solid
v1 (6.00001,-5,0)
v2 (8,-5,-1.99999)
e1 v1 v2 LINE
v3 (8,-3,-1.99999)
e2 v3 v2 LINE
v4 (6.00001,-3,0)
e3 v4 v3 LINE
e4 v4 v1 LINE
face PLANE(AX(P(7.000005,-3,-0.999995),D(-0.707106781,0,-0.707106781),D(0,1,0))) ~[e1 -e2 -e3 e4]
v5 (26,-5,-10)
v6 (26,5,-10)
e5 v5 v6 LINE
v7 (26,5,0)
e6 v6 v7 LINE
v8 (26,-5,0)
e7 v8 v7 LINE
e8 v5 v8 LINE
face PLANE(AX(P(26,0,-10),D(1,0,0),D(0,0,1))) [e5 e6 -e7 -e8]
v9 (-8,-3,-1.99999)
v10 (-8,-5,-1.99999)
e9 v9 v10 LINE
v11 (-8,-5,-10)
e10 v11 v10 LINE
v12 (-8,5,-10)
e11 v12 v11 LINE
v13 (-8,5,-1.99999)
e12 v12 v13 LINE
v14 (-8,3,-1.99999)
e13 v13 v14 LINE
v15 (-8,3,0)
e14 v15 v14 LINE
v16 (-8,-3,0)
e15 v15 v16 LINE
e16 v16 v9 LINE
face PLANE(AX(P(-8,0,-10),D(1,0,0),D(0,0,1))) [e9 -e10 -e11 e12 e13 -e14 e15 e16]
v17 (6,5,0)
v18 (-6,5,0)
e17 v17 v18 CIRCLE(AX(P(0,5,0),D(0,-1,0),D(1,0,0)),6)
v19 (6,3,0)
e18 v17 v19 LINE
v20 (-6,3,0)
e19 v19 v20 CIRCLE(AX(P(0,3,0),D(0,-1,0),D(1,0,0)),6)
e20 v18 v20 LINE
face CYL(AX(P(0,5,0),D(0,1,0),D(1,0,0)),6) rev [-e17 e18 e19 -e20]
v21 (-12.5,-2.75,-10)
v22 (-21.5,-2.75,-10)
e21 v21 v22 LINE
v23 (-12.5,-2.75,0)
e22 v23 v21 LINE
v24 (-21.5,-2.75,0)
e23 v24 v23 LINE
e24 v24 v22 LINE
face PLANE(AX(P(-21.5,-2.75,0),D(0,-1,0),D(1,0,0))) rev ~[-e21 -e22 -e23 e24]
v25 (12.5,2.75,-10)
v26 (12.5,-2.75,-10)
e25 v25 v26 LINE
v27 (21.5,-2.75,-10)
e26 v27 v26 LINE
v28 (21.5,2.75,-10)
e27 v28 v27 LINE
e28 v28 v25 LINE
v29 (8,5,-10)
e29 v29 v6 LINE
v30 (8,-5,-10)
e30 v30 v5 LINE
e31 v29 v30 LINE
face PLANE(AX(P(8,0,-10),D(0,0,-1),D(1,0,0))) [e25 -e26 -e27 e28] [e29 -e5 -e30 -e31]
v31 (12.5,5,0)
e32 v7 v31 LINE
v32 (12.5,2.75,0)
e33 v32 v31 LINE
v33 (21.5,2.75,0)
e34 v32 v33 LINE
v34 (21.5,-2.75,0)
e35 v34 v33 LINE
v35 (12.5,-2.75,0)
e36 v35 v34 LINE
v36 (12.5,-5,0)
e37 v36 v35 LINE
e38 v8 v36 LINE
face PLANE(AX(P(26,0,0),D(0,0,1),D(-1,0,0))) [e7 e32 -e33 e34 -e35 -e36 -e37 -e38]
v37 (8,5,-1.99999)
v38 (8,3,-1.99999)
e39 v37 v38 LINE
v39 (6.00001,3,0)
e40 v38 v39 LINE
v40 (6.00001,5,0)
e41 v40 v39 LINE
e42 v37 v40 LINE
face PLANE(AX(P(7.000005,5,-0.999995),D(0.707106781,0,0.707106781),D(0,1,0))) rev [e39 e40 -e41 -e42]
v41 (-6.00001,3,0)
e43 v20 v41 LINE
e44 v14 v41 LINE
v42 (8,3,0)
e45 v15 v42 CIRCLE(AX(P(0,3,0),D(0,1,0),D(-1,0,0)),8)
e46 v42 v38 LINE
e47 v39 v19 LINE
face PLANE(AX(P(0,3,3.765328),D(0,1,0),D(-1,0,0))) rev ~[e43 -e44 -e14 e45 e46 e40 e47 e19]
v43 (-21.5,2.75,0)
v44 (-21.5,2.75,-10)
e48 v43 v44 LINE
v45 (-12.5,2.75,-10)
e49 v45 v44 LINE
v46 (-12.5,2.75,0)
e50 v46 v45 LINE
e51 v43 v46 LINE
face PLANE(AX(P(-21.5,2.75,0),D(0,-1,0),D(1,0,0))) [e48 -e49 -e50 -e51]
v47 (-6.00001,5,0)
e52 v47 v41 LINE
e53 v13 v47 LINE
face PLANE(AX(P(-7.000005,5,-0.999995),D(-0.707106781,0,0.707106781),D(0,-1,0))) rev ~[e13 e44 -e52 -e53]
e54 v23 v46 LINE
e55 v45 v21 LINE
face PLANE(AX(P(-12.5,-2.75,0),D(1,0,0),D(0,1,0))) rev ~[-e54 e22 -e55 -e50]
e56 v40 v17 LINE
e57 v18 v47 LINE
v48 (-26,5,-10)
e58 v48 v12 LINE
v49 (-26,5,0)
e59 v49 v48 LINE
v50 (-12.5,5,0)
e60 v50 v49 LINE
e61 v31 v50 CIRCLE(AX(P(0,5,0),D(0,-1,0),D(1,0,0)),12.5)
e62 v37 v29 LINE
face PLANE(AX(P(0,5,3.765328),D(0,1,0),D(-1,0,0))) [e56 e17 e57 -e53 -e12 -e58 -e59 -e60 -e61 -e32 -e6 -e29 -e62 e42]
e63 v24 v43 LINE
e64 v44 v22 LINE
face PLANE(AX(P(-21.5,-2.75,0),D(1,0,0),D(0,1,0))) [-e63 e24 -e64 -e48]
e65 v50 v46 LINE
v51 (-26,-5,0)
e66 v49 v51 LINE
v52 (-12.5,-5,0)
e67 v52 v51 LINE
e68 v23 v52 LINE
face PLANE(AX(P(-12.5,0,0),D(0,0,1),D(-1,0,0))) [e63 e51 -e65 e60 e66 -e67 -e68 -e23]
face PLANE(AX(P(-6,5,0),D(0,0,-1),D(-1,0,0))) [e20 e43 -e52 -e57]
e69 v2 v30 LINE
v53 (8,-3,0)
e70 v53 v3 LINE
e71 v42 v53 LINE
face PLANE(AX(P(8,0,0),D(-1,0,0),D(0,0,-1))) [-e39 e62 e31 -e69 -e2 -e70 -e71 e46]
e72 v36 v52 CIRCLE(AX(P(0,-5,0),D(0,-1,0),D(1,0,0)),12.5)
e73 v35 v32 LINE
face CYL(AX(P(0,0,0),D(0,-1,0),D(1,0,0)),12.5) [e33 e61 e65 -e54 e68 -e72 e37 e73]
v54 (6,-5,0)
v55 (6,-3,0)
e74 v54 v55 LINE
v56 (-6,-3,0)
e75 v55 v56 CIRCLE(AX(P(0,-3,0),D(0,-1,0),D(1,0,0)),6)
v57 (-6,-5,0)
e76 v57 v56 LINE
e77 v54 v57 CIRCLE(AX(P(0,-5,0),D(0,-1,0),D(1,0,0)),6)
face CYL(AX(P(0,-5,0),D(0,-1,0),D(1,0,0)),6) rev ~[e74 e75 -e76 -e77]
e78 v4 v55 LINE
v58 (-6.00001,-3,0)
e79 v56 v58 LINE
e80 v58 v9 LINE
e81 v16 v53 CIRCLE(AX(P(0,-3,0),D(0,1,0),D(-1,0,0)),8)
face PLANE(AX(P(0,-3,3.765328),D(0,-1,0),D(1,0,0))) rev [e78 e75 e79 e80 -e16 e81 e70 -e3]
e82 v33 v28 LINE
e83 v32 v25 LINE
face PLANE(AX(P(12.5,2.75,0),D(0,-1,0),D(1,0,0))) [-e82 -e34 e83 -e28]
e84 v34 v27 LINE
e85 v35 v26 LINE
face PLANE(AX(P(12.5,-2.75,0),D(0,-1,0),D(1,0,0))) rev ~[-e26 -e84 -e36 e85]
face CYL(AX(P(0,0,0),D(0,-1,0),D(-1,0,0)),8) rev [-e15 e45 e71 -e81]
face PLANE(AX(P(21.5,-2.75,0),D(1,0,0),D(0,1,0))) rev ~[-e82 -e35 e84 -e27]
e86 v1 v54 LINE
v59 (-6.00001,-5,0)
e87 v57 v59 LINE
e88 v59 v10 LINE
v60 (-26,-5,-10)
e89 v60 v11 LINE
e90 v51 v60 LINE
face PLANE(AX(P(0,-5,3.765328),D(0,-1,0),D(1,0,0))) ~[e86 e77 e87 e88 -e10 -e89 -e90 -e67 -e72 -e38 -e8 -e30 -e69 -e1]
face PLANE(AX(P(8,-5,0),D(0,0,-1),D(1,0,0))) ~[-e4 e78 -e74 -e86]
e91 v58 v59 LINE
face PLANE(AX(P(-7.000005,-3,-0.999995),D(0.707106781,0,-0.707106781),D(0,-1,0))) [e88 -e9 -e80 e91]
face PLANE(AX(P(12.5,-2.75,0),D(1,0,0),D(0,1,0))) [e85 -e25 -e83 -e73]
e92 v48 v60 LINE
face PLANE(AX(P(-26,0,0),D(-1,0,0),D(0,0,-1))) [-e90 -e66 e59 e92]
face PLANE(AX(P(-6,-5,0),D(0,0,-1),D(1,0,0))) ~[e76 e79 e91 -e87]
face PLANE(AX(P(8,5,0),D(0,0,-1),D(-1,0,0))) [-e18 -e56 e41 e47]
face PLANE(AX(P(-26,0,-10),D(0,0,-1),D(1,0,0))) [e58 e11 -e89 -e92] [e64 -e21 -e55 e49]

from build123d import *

# Parameters (mm, degrees)
F1_DEPTH      = 5
F1_DEPTH_BACK = 5
F3_DEPTH      = 2
F5_W          = 9
F5_H          = 5.5
F6_DEPTH      = 25
F7_SIZE       = 1.99999


# Not quite as in the source:
# - a fillet or chamfer is up to 0.001 mm smaller than in the source, because OpenCascade refuses the exact size


with BuildPart() as f1:
    # F0 (on Front) → F1 (new body, two sides)
    with BuildSketch(Plane.XZ) as f1_sk:
        with BuildLine():
            Line((8, 0), (12.5, 0))
            ThreePointArc((12.5, 0), (0, 12.5), (-12.5, 0))
            Line((-12.5, 0), (-8, 0))
            ThreePointArc((-8, 0), (0, 8), (8, 0))
        make_face()
        Polygon((26, 0), (12.5, 0), (8, 0), (8, -10), (26, -10), align=None)
        Polygon((-8, 0), (-12.5, 0), (-26, 0), (-26, -10), (-8, -10), align=None)
    extrude(amount=F1_DEPTH)
    extrude(f1_sk.sketch, amount=-F1_DEPTH_BACK)

    # F2 (on face) → F3 (join)
    with BuildSketch(Plane(origin=(0, 5, 0), x_dir=(-1, 0, 0), z_dir=(0, 1, 0))):
        with BuildLine():
            Line((6, 0), (8, 0))
            ThreePointArc((8, 0), (0, 8), (-8, 0))
            Line((-8, 0), (-6, 0))
            ThreePointArc((-6, 0), (0, 6), (6, 0))
        make_face()
    extrude(amount=-F3_DEPTH)

    # F4: F1 across plane


with BuildPart() as f1_1:
    add(f1.part)
    add(f1.part.mirror(Plane.XZ))

    # F5 (on face) → F6 (cut)
    with BuildSketch(Plane.XY):
        with Locations((-17, 0)):
            Rectangle(F5_W, F5_H)
        with Locations((17, 0)):
            Rectangle(F5_W, F5_H)
    extrude(amount=-F6_DEPTH, mode=Mode.SUBTRACT)

    # F7 (size 2 in the source; OpenCascade refuses exactly that, so slightly less here)
    f7_edges = [f1_1.edges().sort_by_distance(p)[0] for p in [
        (-8, -4, 0),
        (-8, 0, 0),
        (-8, 4, 0),
        (8, 0, 0),
        (8, -4, 0),
        (8, 4, 0),
    ]]
    chamfer(f7_edges, length=F7_SIZE)


solid = f1_1.part
